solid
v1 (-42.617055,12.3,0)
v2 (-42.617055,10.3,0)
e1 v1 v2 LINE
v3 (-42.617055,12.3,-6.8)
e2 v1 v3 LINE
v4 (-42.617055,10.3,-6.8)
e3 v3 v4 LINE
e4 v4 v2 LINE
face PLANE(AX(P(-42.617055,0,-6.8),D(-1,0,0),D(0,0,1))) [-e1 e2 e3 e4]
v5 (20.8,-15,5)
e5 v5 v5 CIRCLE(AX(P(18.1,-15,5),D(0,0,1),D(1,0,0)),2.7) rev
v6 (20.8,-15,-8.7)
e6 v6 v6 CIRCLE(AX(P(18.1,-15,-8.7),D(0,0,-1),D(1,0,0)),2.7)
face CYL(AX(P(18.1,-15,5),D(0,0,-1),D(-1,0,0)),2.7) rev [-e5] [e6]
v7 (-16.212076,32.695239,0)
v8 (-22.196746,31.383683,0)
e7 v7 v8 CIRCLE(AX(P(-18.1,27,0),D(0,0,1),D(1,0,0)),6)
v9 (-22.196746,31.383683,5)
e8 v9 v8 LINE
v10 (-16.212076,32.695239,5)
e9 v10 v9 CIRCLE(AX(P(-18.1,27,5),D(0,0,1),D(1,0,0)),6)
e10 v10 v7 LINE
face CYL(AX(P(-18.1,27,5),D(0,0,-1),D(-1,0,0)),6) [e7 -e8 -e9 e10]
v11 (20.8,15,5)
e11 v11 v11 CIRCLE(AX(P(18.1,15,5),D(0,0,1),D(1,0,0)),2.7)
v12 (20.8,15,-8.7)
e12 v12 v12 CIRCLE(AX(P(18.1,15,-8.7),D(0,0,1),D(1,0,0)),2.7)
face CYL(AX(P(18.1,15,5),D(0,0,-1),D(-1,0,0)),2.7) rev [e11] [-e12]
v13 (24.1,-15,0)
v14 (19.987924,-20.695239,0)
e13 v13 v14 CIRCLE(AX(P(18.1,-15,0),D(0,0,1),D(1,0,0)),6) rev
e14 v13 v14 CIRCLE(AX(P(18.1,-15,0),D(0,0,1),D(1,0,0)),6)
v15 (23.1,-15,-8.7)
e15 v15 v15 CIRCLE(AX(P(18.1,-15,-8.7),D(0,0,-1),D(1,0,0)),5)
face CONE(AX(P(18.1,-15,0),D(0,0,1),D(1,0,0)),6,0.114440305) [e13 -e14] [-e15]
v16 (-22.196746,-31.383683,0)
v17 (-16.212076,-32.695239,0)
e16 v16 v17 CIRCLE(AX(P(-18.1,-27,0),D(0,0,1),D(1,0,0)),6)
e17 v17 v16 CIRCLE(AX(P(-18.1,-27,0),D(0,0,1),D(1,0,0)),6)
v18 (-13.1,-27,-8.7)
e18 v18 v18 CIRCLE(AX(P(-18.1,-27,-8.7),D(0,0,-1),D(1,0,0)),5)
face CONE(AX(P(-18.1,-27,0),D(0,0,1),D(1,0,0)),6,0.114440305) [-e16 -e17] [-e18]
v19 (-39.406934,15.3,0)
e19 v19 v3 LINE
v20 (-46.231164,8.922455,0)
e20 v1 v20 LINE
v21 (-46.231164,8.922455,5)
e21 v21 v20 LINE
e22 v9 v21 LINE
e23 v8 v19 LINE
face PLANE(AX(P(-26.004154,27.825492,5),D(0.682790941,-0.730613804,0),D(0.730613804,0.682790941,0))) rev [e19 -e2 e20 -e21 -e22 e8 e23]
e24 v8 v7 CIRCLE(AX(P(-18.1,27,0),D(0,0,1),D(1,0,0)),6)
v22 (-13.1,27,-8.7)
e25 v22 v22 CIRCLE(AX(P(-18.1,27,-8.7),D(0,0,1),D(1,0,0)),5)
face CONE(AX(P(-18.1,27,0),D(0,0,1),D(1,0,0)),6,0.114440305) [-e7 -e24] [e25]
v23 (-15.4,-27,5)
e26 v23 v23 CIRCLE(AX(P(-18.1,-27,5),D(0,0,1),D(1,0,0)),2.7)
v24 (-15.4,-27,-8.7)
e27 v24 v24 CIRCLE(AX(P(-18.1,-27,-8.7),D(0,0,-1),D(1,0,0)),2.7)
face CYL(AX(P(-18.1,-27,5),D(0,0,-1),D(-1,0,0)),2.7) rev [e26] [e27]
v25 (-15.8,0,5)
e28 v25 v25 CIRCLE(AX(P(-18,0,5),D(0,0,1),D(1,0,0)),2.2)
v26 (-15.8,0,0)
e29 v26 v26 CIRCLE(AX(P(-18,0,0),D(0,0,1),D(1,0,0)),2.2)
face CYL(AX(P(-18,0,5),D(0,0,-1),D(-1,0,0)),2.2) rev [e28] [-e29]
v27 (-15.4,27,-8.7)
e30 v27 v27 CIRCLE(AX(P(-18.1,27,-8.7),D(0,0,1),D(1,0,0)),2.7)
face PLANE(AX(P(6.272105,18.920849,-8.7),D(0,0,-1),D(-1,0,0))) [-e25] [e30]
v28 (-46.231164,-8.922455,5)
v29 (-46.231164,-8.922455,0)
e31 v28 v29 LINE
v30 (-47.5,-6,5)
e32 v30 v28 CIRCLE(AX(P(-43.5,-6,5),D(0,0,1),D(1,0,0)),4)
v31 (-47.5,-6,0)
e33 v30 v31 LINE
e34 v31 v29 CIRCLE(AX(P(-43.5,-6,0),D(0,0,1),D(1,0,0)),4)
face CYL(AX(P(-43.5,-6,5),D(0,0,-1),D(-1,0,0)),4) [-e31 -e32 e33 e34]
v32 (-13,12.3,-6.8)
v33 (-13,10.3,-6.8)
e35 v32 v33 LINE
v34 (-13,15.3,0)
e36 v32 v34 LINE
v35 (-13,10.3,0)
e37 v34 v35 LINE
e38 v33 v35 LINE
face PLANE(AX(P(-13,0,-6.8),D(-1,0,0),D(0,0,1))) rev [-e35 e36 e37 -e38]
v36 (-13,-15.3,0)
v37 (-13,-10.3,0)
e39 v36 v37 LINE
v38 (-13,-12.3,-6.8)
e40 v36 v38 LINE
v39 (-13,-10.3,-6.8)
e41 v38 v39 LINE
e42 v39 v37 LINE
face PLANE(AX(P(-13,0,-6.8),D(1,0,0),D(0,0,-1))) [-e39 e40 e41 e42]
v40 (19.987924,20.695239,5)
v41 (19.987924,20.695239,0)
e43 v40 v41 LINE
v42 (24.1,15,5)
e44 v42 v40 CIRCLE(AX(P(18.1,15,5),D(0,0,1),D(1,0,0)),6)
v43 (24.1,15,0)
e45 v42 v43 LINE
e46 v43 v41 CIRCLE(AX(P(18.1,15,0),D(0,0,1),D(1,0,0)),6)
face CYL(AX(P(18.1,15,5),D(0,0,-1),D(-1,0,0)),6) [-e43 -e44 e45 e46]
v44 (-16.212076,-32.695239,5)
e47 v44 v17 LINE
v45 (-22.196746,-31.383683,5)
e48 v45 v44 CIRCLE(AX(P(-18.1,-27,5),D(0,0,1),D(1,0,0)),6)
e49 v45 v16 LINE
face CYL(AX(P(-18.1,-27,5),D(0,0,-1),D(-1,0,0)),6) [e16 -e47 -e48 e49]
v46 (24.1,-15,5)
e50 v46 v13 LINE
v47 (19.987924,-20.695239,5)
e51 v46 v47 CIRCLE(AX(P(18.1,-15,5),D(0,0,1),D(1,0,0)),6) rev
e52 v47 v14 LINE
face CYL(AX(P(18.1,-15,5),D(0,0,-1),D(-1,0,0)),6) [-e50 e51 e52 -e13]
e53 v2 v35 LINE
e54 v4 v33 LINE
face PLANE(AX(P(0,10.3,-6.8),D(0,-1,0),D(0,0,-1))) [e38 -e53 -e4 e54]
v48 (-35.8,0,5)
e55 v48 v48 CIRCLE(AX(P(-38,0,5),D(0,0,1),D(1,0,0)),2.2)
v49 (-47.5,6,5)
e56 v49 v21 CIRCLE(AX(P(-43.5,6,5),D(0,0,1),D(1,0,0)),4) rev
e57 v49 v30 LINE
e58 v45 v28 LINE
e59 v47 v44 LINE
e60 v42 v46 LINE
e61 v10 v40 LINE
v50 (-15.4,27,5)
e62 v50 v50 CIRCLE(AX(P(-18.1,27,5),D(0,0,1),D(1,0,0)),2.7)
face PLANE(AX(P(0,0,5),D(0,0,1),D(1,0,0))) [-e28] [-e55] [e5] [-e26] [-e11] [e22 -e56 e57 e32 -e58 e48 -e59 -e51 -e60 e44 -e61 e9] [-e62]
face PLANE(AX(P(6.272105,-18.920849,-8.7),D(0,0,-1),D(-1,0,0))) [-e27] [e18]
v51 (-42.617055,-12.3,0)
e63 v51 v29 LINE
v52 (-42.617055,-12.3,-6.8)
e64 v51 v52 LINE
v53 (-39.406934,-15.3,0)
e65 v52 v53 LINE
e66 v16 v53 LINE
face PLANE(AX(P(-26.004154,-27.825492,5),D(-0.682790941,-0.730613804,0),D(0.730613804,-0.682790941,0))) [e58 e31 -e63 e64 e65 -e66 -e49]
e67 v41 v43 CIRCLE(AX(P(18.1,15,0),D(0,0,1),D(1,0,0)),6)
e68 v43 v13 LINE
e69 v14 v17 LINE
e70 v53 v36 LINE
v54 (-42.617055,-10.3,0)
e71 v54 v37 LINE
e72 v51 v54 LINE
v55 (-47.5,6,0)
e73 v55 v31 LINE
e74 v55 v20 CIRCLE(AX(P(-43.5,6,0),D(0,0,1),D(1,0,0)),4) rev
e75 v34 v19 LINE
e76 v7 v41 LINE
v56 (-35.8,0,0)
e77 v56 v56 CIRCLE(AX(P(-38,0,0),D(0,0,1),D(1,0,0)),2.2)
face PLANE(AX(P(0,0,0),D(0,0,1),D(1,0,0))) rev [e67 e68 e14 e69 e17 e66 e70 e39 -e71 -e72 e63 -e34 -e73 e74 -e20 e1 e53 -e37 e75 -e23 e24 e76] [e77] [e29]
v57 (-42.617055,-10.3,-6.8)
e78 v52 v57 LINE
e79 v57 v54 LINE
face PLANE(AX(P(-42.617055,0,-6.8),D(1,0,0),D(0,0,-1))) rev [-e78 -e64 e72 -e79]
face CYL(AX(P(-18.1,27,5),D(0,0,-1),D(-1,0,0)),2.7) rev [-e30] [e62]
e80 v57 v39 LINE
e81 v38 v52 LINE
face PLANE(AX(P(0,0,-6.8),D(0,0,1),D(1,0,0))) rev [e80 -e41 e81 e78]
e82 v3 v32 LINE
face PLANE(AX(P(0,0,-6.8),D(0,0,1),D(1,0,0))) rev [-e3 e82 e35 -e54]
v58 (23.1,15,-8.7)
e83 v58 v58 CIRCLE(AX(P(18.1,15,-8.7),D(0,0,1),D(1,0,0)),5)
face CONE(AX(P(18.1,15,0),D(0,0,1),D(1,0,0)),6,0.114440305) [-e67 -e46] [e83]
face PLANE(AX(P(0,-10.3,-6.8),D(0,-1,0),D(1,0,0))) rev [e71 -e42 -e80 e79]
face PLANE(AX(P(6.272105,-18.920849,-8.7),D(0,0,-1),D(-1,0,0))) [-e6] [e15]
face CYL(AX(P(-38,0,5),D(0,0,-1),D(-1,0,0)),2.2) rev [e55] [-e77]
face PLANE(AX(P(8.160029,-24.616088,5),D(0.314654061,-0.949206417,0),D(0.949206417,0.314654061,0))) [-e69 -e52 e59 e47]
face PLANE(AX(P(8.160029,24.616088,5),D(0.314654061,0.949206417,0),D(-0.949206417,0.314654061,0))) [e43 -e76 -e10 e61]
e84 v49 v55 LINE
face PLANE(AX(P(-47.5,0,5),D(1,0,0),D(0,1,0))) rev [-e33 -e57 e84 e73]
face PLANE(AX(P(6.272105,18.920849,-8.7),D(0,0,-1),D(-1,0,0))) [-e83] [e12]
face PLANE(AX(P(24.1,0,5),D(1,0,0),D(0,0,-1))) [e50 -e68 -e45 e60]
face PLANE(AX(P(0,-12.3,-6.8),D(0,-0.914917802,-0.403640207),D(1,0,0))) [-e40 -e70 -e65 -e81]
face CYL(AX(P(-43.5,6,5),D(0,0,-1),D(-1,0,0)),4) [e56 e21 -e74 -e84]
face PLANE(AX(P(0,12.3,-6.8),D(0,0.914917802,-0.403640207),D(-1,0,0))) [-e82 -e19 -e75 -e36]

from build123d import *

# Parameters (mm, degrees)
SKETCH_1_R       = 2.7
SKETCH_1_R_2     = 2.2
EXTRUDE_1_DEPTH  = 5
SKETCH_1_4_W     = 29.617054823
SKETCH_1_4_H     = 2
EXTRUDE_2_DEPTH  = 6.8
CHAMFER_1_SIZE   = 3
CHAMFER_1_SIZE_2 = 6.8
CHAMFER_2_SIZE   = 3
CHAMFER_2_SIZE_2 = 6.8


with BuildPart() as part:
    # 草图1 → 凸台-拉伸1 (new body)
    with BuildSketch(Plane.XY):
        with BuildLine():
            Line((-22.196745644, 31.383682827), (-46.231163763, 8.922455218))
            ThreePointArc((-46.231163763, 8.922455218), (-47.169104458, 7.593007368), (-47.5, 6))
            Line((-47.5, 6), (-47.5, -6))
            ThreePointArc((-47.5, -6), (-47.169104458, -7.593007368), (-46.231163763, -8.922455218))
            Line((-46.231163763, -8.922455218), (-22.196745644, -31.383682827))
            ThreePointArc((-22.196745644, -31.383682827), (-19.384432728, -32.860907145), (-16.212075635, -32.695238502))
            Line((-16.212075635, -32.695238502), (19.987924365, -20.695238502))
            ThreePointArc((19.987924365, -20.695238502), (22.964542434, -18.512296529), (24.1, -15))
            Line((24.1, -15), (24.1, 15))
            ThreePointArc((24.1, 15), (22.964542434, 18.512296529), (19.987924365, 20.695238502))
            Line((19.987924365, 20.695238502), (-16.212075635, 32.695238502))
            ThreePointArc((-16.212075635, 32.695238502), (-19.384432728, 32.860907145), (-22.196745644, 31.383682827))
        make_face()
        with Locations((18.1, -15)):
            Circle(SKETCH_1_R, mode=Mode.SUBTRACT)
        with Locations((-38, 0)):
            Circle(SKETCH_1_R_2, mode=Mode.SUBTRACT)
        with Locations((-18, 0)):
            Circle(SKETCH_1_R_2, mode=Mode.SUBTRACT)
        with Locations((-18.1, 27)):
            Circle(SKETCH_1_R, mode=Mode.SUBTRACT)
        with Locations((18.1, 15)):
            Circle(SKETCH_1_R, mode=Mode.SUBTRACT)
        with Locations((-18.1, -27)):
            Circle(SKETCH_1_R, mode=Mode.SUBTRACT)
    extrude(amount=EXTRUDE_1_DEPTH)

    # 草图4 → 旋转1 (revolve)
    with BuildSketch(Plane(origin=(6.272104728, 18.920849262, 0), x_dir=(-0.9492064169502825, 0.3146540608674969, 0), z_dir=(-0.3146540608674969, -0.9492064169502825, 0)), mode=Mode.PRIVATE) as revolve_1_sk:
        Polygon((-6.460825234, 0), (-7.460825234, 8.7), (-9.760825234, 8.7), (-9.760825234, 0), align=None)
    revolve_1 = revolve(revolve_1_sk.sketch.rotate(Axis((18.1, 15, 4.45283877), (0, 0, -1)), 161.660068966), axis=Axis((18.1, 15, 4.45283877), (0, 0, -1)))

    # 草图4<3> → 旋转2 (revolve)
    with BuildSketch(Plane(origin=(6.272104728, 18.920849262, 0), x_dir=(-0.9492064169502825, 0.3146540608674969, 0), z_dir=(-0.3146540608674969, -0.9492064169502825, 0)), mode=Mode.PRIVATE) as revolve_2_sk:
        Polygon((30.67629579, 8.7), (28.37629579, 8.7), (28.37629579, 0), (31.67629579, 0), align=None)
    revolve_2 = revolve(revolve_2_sk.sketch.rotate(Axis((-18.1, 27, 0), (0, 0, -1)), 161.660068966), axis=Axis((-18.1, 27, 0), (0, 0, -1)))

    # 镜向1: 旋转1, 旋转2 across plane
    add(revolve_1.mirror(Plane.ZX))
    add(revolve_2.mirror(Plane.ZX))

    # 草图1<4> → 凸台-拉伸2 (add)
    with BuildSketch(Plane.XY):
        with Locations((-27.808527412, 11.3)):
            Rectangle(SKETCH_1_4_W, SKETCH_1_4_H)
        with Locations((-27.808527412, -11.3)):
            Rectangle(SKETCH_1_4_W, SKETCH_1_4_H)
    extrude(amount=-EXTRUDE_2_DEPTH)

    # 倒角1
    # the kernel refuses this chamfer: 6.8, 3 mm, written as the material it adds along each edge
    with BuildSketch(Plane(origin=(-13, 12.3, 0), x_dir=(0, 0.9968133817371192, 0.07976892872421078), z_dir=(-1, 0, 0))) as chamfer_1_piece_1_section:
        Polygon((CHAMFER_1_SIZE * 0.996813381737, CHAMFER_1_SIZE * 0.0797689287242), (-CHAMFER_1_SIZE_2 * 0.0797689287242, CHAMFER_1_SIZE_2 * 0.996813381737), (0, 0), align=None)
    chamfer_1_piece_1 = extrude(amount=29.617054823, mode=Mode.PRIVATE)
    chamfer_1_piece_1 = split(chamfer_1_piece_1, bisect_by=Plane(origin=(-33.986119971, 20.365990665, -2.314362064), z_dir=(0.6827909407070696, -0.730613804474262, 0)), keep=Keep.TOP, mode=Mode.PRIVATE)
    chamfer_1_piece_1 = split(chamfer_1_piece_1, bisect_by=Plane(origin=(-27.310795563, 13.223124714, -6.8), z_dir=(0, 0, 1)), keep=Keep.TOP, mode=Mode.PRIVATE)
    add(chamfer_1_piece_1)

    # 倒角2
    # the kernel refuses this chamfer: 6.8, 3 mm, written as the material it adds along each edge
    with BuildSketch(Plane(origin=(-42.617054823, -12.3, 0), x_dir=(0, -0.9968133817371192, 0.07976892872421078), z_dir=(1, 0, 0))) as chamfer_2_piece_1_section:
        Polygon((CHAMFER_2_SIZE * 0.996813381737, CHAMFER_2_SIZE * 0.0797689287242), (-CHAMFER_2_SIZE_2 * 0.0797689287242, CHAMFER_2_SIZE_2 * 0.996813381737), (0, 0), align=None)
    chamfer_2_piece_1 = extrude(amount=29.617054823, mode=Mode.PRIVATE)
    chamfer_2_piece_1 = split(chamfer_2_piece_1, bisect_by=Plane(origin=(-33.986119971, -20.365990665, -2.314362064), z_dir=(0.6827909407070697, 0.7306138044742619, 0)), keep=Keep.TOP, mode=Mode.PRIVATE)
    chamfer_2_piece_1 = split(chamfer_2_piece_1, bisect_by=Plane(origin=(-27.310795563, -13.223124714, -6.8), z_dir=(0, 0, 1)), keep=Keep.TOP, mode=Mode.PRIVATE)
    add(chamfer_2_piece_1)


solid = part.part
